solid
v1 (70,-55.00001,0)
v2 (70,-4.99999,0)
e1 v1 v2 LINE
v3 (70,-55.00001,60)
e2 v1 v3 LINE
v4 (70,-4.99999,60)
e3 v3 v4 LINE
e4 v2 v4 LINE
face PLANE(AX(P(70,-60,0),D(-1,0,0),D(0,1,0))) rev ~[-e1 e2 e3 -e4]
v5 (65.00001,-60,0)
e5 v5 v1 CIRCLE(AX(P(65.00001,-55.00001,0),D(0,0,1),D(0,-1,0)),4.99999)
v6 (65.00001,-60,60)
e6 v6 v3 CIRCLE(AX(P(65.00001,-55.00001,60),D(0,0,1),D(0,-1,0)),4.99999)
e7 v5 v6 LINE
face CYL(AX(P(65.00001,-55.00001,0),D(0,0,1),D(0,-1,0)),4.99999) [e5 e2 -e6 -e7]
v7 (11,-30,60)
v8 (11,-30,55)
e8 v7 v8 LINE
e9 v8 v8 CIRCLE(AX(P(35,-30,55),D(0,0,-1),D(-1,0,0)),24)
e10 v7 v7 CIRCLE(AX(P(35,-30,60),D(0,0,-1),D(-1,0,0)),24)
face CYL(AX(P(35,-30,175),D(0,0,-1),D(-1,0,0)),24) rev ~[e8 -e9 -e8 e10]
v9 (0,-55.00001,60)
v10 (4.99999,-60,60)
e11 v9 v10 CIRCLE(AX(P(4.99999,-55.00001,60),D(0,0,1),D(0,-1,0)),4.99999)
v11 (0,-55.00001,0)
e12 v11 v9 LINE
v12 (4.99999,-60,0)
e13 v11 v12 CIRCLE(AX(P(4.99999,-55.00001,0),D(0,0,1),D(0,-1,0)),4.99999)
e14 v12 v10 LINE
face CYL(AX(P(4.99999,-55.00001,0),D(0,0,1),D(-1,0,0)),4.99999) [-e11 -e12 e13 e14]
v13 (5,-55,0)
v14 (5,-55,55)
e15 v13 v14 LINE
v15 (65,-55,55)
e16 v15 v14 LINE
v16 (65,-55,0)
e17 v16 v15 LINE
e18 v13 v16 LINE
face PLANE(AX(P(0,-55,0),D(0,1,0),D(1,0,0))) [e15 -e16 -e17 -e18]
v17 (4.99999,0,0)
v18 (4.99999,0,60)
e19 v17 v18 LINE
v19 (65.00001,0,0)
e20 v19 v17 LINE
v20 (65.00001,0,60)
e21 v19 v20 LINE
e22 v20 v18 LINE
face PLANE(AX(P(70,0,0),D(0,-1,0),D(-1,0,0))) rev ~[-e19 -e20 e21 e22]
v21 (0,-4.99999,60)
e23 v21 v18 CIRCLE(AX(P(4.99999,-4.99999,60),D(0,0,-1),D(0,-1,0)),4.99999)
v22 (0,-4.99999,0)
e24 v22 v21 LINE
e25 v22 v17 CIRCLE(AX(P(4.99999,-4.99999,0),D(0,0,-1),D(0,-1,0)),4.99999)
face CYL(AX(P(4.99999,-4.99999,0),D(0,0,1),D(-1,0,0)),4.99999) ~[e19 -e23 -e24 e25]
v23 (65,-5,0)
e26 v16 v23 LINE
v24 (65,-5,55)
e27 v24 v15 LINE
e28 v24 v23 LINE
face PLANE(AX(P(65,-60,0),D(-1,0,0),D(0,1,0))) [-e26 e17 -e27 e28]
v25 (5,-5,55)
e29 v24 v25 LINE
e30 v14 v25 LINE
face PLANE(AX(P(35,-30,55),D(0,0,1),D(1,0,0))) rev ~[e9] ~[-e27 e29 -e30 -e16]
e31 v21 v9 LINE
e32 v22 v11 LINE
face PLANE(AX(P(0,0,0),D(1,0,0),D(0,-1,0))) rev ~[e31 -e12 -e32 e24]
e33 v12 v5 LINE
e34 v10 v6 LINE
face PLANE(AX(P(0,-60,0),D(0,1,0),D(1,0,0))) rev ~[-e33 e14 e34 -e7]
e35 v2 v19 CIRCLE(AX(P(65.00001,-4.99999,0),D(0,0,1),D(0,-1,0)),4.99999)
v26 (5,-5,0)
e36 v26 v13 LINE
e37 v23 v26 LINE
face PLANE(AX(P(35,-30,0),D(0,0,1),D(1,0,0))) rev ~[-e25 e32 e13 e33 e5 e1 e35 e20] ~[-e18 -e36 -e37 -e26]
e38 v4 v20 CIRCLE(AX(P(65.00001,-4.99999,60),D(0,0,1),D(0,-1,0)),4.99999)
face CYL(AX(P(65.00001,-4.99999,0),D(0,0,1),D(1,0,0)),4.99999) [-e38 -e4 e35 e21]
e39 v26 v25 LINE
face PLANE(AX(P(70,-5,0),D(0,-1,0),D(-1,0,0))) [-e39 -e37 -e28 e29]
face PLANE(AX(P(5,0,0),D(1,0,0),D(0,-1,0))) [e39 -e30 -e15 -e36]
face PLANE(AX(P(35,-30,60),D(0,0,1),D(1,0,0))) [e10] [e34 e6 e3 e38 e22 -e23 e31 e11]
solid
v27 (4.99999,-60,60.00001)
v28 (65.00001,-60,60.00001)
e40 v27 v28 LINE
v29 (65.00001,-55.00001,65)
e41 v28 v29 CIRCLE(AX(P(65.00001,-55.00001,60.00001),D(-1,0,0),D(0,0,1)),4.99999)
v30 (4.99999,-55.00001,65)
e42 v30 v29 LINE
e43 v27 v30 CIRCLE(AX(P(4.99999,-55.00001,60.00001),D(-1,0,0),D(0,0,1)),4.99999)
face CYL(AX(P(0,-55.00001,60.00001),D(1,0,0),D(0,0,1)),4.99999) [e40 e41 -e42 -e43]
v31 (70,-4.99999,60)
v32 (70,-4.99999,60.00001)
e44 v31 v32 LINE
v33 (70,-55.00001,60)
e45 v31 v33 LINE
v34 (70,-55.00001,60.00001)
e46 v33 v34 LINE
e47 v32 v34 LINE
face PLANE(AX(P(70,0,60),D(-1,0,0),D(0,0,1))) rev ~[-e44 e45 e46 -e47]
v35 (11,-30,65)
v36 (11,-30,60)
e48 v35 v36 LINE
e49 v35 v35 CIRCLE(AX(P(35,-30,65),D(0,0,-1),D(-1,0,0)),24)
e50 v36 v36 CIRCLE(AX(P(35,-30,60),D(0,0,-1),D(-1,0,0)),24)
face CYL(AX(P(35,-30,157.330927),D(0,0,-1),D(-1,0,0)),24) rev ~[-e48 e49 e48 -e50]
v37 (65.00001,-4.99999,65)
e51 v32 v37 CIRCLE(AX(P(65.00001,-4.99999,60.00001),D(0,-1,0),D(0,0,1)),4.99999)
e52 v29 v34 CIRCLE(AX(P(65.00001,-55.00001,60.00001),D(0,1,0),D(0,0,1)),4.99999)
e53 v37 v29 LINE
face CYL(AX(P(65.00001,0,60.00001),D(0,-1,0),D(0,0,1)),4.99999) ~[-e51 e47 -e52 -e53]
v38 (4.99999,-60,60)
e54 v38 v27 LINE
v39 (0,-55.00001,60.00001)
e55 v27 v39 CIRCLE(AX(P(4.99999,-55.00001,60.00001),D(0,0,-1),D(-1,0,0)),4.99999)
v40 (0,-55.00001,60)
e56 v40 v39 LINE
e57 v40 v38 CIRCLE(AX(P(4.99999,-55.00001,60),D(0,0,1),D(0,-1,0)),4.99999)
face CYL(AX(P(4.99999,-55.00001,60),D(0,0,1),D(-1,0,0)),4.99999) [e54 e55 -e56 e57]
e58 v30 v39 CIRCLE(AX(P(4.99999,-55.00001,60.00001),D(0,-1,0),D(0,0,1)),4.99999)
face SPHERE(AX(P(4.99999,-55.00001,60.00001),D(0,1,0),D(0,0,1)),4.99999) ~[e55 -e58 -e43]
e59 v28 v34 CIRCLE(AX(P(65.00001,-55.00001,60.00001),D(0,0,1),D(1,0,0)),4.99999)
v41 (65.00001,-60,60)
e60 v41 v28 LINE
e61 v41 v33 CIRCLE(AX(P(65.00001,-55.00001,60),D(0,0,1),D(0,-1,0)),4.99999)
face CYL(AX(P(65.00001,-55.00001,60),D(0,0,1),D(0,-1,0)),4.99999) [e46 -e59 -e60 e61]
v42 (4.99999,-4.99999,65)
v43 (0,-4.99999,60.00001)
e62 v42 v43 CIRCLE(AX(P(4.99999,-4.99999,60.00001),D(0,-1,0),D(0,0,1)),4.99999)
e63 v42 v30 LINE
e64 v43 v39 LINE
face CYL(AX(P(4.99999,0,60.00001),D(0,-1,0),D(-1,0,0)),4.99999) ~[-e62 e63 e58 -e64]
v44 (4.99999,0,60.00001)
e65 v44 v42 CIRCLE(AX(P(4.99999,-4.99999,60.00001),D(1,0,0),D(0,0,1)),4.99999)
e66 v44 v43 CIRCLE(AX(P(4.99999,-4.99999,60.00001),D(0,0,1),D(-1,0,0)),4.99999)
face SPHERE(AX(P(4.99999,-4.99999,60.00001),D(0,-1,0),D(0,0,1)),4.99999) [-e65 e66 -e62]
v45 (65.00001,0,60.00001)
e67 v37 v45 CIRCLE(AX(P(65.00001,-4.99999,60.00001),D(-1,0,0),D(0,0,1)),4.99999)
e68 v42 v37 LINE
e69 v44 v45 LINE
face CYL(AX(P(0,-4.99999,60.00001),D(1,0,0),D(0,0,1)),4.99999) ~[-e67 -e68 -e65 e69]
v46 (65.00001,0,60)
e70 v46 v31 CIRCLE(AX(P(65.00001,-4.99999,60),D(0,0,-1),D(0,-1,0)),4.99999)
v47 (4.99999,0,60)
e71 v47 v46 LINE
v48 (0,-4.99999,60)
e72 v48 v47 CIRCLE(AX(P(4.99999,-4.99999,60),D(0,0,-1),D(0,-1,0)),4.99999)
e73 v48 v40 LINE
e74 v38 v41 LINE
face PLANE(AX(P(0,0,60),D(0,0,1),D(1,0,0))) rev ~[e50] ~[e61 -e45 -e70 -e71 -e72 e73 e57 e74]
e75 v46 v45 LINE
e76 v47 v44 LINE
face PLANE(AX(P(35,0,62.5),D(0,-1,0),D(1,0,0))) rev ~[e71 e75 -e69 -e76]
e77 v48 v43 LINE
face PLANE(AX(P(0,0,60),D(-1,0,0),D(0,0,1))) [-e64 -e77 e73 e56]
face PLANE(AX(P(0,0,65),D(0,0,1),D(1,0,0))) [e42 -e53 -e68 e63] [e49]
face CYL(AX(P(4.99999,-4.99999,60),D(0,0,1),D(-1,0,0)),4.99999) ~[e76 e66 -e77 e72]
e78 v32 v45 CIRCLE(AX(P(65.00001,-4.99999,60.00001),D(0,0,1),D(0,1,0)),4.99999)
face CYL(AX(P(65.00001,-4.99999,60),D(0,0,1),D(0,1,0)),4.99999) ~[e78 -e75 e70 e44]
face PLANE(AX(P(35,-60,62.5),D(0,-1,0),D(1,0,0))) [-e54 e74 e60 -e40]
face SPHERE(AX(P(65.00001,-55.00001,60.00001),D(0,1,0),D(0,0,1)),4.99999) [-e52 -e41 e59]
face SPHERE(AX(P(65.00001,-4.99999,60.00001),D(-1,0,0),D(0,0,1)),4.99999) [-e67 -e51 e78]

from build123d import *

# Parameters (mm, degrees)
F1_DEPTH = 60
F2_W     = 70
F2_H     = 5
F3_DEPTH = 60
F5_D     = 48
F6_R     = 4.99999
F6_2_R   = 4.99999
F7_T     = 5
F8_D     = 48


# Not quite as in the source:
# - a fillet or chamfer is up to 0.001 mm smaller than in the source, because OpenCascade refuses the exact size
# - a shell that OpenCascade refuses in one call is made with other operations: the cavity is built on its own and cut out
# - a feature names something its author has since deleted; it is built from what else it names


with BuildPart() as f1:
    # F0 (on Top) → F1 (new body)
    with BuildSketch(Plane.XY):
        Polygon((10, 0), (0, 0), (0, -10), (0, -50), (0, -60), (10, -60), (60, -60), (70, -60), (70, -50), (70, -10), (70, 0), (60, 0), align=None)
    extrude(amount=F1_DEPTH)

    # F6#2 (radius 5 in the source; OpenCascade refuses exactly that, so slightly less here)
    f6_2_edges = [f1.edges().sort_by_distance(p)[0] for p in [
        (0, -60, 30),
        (70, -60, 30),
        (70, 0, 30),
        (0, 0, 30),
    ]]
    fillet(f6_2_edges, radius=F6_2_R)

    # F7: shell of thickness 5, made by hand


with BuildPart() as f3:
    # F2 (on Front) → F3 (new body)
    with BuildSketch(Plane.XZ):
        with Locations((35, 62.5)):
            Rectangle(F2_W, F2_H)
    extrude(amount=F3_DEPTH)

    # F5 (through all)
    with Locations(Plane.XY.offset(65)):
        with Locations((35, -30)):
            Hole(F5_D / 2)

    # F6 (radius 5 in the source; OpenCascade refuses exactly that, so slightly less here)
    f6_edges = [f3.edges().sort_by_distance(p)[0] for p in [
        (0, -30, 65),
        (35, 0, 65),
        (70, -30, 65),
        (35, -60, 65),
        (0, 0, 62.5),
        (0, -60, 62.5),
        (70, 0, 62.5),
        (70, -60, 62.5),
    ]]
    fillet(f6_edges, radius=F6_R)


with BuildPart() as f7_core1:
    # F7_t2: copy of F1
    add(f1.part)

    # the walls: a layer under each face that stays
    f7_faces = [f7_core1.faces().sort_by_distance(p)[0] for p in [
        (35, 0, 30),
        (35, -30, 60),
        (0, -30, 30),
        (35, -60, 30),
        (70, -30, 30),
    ]]
    thicken(f7_faces, amount=-F7_T, mode=Mode.SUBTRACT)


with BuildPart() as f1_1:
    add(f1.part)

    # what is left inside the walls is the cavity
    f7_cavity = [f7_core1.part.solids().sort_by_distance(p)[0] for p in [
        (35, -5.05, 36.666667),
    ]]
    add(f7_cavity, mode=Mode.SUBTRACT)

    # F8 (through all)
    with Locations(Plane.XY.offset(65)):
        with Locations((35, -30)):
            Hole(F8_D / 2)


solid = Compound([f3.part, f1_1.part])
